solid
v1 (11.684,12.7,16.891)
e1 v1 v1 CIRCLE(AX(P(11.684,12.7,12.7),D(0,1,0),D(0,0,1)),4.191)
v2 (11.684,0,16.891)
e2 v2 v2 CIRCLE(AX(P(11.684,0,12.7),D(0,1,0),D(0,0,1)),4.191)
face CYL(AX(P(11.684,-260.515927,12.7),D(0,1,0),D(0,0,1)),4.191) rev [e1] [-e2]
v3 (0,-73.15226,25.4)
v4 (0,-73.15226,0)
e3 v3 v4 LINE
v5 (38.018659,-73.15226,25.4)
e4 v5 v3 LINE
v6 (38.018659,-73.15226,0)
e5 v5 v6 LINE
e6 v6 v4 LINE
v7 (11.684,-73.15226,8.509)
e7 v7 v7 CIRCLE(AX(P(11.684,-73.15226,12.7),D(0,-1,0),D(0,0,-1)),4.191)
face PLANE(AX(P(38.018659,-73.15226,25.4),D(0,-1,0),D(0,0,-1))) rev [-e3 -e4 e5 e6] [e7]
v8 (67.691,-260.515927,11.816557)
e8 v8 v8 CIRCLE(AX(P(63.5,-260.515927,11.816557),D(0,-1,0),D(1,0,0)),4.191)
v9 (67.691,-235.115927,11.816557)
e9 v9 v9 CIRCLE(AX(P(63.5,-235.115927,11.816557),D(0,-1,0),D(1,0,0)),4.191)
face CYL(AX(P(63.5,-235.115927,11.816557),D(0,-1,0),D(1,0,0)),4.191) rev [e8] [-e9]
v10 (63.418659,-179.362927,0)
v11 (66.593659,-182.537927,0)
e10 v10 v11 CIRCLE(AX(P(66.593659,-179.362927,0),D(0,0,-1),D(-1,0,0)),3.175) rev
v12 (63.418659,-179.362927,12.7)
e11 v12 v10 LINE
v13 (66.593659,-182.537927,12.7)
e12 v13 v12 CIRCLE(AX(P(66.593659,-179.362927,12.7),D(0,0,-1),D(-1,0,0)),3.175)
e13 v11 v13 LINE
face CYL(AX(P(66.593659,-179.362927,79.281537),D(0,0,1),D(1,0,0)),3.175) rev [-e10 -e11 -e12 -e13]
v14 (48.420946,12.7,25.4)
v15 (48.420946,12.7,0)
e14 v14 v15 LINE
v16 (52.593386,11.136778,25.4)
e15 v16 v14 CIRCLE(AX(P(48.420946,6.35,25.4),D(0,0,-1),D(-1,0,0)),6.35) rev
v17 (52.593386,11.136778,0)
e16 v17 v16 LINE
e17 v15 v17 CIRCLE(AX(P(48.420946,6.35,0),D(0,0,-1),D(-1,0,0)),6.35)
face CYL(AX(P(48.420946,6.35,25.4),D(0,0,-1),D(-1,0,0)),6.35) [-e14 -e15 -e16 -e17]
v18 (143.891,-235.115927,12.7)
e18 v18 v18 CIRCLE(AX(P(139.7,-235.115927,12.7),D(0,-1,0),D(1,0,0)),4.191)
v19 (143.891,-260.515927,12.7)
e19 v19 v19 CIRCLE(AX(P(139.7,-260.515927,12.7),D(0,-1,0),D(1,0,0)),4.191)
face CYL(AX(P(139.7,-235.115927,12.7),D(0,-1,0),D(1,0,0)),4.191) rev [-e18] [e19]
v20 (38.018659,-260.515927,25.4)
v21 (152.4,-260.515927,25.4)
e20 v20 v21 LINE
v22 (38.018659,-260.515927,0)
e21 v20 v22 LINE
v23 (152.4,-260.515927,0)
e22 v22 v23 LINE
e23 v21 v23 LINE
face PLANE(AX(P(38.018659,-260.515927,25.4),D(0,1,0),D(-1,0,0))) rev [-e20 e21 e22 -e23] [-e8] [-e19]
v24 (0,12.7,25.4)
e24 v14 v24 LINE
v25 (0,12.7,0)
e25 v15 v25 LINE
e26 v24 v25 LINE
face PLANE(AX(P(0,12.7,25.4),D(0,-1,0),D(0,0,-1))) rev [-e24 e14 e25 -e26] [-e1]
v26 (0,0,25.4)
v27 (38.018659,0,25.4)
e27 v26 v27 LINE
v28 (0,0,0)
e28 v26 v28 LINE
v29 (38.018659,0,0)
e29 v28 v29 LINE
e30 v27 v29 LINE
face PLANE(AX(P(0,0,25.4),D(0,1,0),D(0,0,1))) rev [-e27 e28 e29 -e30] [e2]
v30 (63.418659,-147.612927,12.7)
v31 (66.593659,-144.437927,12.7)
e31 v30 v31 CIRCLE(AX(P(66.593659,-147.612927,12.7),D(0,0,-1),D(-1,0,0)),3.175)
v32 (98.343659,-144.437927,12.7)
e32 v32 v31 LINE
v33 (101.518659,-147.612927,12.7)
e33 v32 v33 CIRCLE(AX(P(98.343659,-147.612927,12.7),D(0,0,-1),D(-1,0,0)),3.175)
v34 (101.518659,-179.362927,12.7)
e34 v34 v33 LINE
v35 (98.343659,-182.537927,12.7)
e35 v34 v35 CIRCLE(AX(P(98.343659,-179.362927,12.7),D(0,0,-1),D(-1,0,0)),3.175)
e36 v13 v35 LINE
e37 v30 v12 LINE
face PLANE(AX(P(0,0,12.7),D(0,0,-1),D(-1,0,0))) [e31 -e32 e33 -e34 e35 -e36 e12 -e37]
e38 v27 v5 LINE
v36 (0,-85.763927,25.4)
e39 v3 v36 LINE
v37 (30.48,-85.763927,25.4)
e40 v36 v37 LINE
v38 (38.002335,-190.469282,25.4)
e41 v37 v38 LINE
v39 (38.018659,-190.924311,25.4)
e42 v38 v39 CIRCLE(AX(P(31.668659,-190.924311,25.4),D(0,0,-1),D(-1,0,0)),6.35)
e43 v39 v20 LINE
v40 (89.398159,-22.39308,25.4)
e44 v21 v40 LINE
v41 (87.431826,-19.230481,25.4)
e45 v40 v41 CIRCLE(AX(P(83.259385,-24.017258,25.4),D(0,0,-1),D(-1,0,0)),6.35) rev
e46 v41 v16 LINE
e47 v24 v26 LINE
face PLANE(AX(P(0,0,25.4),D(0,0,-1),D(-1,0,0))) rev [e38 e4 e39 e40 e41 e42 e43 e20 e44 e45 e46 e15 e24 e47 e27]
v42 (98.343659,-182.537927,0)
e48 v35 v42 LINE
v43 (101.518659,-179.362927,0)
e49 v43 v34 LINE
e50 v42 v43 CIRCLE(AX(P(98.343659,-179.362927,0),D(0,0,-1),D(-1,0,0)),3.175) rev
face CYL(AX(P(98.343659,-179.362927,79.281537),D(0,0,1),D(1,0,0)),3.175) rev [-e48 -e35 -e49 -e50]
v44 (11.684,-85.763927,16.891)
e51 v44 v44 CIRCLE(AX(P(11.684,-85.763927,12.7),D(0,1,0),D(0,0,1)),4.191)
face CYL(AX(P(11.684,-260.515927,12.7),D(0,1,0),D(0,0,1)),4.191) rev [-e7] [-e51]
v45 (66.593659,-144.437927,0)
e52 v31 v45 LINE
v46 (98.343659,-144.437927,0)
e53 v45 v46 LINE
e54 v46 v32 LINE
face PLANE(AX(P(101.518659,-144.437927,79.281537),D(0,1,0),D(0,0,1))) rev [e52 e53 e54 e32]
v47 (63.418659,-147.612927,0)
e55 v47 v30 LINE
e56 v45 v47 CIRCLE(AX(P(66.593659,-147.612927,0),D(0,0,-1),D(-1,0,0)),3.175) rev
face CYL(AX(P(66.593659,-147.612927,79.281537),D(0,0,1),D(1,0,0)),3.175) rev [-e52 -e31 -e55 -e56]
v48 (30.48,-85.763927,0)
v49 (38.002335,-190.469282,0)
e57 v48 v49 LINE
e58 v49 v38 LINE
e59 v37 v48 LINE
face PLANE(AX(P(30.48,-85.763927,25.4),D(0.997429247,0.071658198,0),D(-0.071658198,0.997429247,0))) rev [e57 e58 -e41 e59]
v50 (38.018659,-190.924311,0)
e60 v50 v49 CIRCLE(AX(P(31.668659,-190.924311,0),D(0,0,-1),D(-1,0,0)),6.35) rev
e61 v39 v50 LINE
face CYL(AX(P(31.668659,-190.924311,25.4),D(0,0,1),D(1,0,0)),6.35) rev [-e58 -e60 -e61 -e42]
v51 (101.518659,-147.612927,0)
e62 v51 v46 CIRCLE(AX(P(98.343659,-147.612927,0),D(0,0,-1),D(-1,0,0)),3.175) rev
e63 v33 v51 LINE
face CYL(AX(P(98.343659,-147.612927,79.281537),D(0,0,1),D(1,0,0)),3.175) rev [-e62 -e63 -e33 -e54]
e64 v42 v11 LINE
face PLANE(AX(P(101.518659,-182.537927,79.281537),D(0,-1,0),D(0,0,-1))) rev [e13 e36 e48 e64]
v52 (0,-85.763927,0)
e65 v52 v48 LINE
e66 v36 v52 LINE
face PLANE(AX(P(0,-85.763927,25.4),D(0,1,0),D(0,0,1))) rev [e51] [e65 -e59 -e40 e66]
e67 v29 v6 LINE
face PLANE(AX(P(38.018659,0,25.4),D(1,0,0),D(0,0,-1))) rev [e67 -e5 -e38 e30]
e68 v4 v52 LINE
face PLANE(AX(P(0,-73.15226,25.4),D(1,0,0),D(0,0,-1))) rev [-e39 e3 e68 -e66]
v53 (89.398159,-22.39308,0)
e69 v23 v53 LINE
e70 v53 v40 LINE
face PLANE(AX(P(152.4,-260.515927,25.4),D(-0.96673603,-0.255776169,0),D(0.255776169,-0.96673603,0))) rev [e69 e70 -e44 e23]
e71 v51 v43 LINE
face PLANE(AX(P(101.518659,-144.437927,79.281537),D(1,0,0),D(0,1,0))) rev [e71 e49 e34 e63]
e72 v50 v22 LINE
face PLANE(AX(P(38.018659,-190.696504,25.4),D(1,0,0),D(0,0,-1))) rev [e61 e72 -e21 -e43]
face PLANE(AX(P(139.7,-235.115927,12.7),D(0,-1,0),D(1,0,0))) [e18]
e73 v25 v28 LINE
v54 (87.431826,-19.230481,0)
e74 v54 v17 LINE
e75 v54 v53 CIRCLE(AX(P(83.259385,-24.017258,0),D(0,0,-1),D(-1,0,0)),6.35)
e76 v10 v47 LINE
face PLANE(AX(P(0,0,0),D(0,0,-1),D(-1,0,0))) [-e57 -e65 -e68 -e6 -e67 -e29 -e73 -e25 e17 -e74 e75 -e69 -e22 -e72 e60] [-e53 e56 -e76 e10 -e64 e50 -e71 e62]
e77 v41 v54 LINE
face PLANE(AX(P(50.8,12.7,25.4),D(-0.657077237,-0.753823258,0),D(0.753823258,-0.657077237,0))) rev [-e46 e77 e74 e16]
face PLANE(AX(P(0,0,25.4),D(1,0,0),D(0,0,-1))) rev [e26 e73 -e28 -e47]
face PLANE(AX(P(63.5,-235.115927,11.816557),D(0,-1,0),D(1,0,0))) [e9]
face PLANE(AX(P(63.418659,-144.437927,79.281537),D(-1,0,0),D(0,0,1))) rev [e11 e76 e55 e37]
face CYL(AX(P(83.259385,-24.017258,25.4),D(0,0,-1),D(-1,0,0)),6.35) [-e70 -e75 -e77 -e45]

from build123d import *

# Parameters (mm, degrees)
BOSS_EXTRUDE1_DEPTH = 25.4
SKETCH2_W           = 38.1
SKETCH2_H           = 38.1
CUT_EXTRUDE1_DEPTH  = 12.7
SKETCH3_R           = 4.191
CUT_EXTRUDE2_DEPTH  = 314.875552812
SKETCH4_R           = 4.191
CUT_EXTRUDE3_DEPTH  = 25.4
FILLET1_R           = 6.35
FILLET2_R           = 3.175


with BuildPart() as part:
    # Sketch1 → Boss-Extrude1 (new body)
    with BuildSketch(Plane.XY):
        Polygon((0, 0), (0, 12.7), (50.8, 12.7), (88.9, -20.510228633), (152.4, -260.515926793), (38.018659419, -260.515926793), (38.018659419, -190.696503564), (30.48, -85.763926793), (0, -85.763926793), (0, -73.152260366), (38.018659419, -73.152260366), (38.018659419, 0), align=None)
    extrude(amount=BOSS_EXTRUDE1_DEPTH)

    # Sketch2 → Cut-Extrude1 (cut)
    with BuildSketch(Plane(origin=(0, 0, 0), x_dir=(-1, 0, 0), z_dir=(0, 0, -1))):
        with Locations((-82.468659419, -163.487926793)):
            Rectangle(SKETCH2_W, SKETCH2_H)
    extrude(amount=-CUT_EXTRUDE1_DEPTH, mode=Mode.SUBTRACT)

    # Sketch3 → Cut-Extrude2 (cut, through all)
    with BuildSketch(Plane(origin=(0, 12.7, 0), x_dir=(1, 0, 0), z_dir=(0, 1, 0))):
        with Locations(Location((11.684, -12.7, 0), (0, 0, 270))):
            Circle(SKETCH3_R)
    extrude(amount=-CUT_EXTRUDE2_DEPTH, mode=Mode.SUBTRACT)

    # Sketch4 → Cut-Extrude3 (cut)
    with BuildSketch(Plane(origin=(0, -260.515926793, 0), x_dir=(-1, 0, 0), z_dir=(0, -1, 0))):
        with Locations(Location((-139.7, -12.7, 0), (0, 0, 180))):
            Circle(SKETCH4_R)
        with Locations(Location((-63.5, -11.81655653, 0), (0, 0, 180))):
            Circle(SKETCH4_R)
    extrude(amount=-CUT_EXTRUDE3_DEPTH, mode=Mode.SUBTRACT)

    # Fillet1
    # the kernel refuses this fillet: 6.35 mm, written as the material it adds along each edge
    with BuildSketch(Plane(origin=(38.018659419, -190.696503564, 0), x_dir=(0, -1, 0), z_dir=(0, 0, 1))) as fillet1_piece_1:
        with BuildLine():
            CenterArc((FILLET1_R * 0.0358752122725, -FILLET1_R), FILLET1_R, 90, 4.109234206)
            Line((-FILLET1_R * 0.0357829859603, -FILLET1_R * 0.00257075307266), (0, 0))
            Line((0, 0), (FILLET1_R * 0.0358752122725, 0))
        make_face()
    extrude(amount=25.4)
    # the kernel refuses this fillet: 6.35 mm, written as the material it takes off along each edge
    with BuildSketch(Plane(origin=(50.8, 12.7, -5.947635314), x_dir=(-1, 0, 0), z_dir=(0, 0, 1))) as fillet1_2_piece_1:
        with BuildLine():
            CenterArc((FILLET1_R * 0.374654193004, FILLET1_R), FILLET1_R, 228.922654606, 41.077345394)
            Line((-FILLET1_R * 0.282423044355, FILLET1_R * 0.246176742103), (0, 0))
            Line((0, 0), (FILLET1_R * 0.374654193004, 0))
        make_face()
    extrude(amount=37.295270628, mode=Mode.SUBTRACT)
    with BuildSketch(Plane(origin=(88.9, -20.510228633, -4.869092834), x_dir=(-0.7538232578965339, 0.6570772373581782, 0), z_dir=(0, 0, 1))) as fillet1_2_piece_2:
        with BuildLine():
            CenterArc((FILLET1_R * 0.306714509228, FILLET1_R), FILLET1_R, 235.896927034, 34.103072966)
            Line((-FILLET1_R * 0.253968896194, FILLET1_R * 0.171969735526), (0, 0))
            Line((0, 0), (FILLET1_R * 0.306714509228, 0))
        make_face()
    extrude(amount=35.138185668, mode=Mode.SUBTRACT)

    # Fillet2
    fillet2_edges = [part.edges().sort_by_distance(p)[0] for p in [
        (101.518659419, -182.537926793, 6.35),
        (101.518659419, -144.437926793, 6.35),
        (63.418659419, -144.437926793, 6.35),
        (63.418659419, -182.537926793, 6.35),
    ]]
    fillet(fillet2_edges, radius=FILLET2_R)


solid = part.part
